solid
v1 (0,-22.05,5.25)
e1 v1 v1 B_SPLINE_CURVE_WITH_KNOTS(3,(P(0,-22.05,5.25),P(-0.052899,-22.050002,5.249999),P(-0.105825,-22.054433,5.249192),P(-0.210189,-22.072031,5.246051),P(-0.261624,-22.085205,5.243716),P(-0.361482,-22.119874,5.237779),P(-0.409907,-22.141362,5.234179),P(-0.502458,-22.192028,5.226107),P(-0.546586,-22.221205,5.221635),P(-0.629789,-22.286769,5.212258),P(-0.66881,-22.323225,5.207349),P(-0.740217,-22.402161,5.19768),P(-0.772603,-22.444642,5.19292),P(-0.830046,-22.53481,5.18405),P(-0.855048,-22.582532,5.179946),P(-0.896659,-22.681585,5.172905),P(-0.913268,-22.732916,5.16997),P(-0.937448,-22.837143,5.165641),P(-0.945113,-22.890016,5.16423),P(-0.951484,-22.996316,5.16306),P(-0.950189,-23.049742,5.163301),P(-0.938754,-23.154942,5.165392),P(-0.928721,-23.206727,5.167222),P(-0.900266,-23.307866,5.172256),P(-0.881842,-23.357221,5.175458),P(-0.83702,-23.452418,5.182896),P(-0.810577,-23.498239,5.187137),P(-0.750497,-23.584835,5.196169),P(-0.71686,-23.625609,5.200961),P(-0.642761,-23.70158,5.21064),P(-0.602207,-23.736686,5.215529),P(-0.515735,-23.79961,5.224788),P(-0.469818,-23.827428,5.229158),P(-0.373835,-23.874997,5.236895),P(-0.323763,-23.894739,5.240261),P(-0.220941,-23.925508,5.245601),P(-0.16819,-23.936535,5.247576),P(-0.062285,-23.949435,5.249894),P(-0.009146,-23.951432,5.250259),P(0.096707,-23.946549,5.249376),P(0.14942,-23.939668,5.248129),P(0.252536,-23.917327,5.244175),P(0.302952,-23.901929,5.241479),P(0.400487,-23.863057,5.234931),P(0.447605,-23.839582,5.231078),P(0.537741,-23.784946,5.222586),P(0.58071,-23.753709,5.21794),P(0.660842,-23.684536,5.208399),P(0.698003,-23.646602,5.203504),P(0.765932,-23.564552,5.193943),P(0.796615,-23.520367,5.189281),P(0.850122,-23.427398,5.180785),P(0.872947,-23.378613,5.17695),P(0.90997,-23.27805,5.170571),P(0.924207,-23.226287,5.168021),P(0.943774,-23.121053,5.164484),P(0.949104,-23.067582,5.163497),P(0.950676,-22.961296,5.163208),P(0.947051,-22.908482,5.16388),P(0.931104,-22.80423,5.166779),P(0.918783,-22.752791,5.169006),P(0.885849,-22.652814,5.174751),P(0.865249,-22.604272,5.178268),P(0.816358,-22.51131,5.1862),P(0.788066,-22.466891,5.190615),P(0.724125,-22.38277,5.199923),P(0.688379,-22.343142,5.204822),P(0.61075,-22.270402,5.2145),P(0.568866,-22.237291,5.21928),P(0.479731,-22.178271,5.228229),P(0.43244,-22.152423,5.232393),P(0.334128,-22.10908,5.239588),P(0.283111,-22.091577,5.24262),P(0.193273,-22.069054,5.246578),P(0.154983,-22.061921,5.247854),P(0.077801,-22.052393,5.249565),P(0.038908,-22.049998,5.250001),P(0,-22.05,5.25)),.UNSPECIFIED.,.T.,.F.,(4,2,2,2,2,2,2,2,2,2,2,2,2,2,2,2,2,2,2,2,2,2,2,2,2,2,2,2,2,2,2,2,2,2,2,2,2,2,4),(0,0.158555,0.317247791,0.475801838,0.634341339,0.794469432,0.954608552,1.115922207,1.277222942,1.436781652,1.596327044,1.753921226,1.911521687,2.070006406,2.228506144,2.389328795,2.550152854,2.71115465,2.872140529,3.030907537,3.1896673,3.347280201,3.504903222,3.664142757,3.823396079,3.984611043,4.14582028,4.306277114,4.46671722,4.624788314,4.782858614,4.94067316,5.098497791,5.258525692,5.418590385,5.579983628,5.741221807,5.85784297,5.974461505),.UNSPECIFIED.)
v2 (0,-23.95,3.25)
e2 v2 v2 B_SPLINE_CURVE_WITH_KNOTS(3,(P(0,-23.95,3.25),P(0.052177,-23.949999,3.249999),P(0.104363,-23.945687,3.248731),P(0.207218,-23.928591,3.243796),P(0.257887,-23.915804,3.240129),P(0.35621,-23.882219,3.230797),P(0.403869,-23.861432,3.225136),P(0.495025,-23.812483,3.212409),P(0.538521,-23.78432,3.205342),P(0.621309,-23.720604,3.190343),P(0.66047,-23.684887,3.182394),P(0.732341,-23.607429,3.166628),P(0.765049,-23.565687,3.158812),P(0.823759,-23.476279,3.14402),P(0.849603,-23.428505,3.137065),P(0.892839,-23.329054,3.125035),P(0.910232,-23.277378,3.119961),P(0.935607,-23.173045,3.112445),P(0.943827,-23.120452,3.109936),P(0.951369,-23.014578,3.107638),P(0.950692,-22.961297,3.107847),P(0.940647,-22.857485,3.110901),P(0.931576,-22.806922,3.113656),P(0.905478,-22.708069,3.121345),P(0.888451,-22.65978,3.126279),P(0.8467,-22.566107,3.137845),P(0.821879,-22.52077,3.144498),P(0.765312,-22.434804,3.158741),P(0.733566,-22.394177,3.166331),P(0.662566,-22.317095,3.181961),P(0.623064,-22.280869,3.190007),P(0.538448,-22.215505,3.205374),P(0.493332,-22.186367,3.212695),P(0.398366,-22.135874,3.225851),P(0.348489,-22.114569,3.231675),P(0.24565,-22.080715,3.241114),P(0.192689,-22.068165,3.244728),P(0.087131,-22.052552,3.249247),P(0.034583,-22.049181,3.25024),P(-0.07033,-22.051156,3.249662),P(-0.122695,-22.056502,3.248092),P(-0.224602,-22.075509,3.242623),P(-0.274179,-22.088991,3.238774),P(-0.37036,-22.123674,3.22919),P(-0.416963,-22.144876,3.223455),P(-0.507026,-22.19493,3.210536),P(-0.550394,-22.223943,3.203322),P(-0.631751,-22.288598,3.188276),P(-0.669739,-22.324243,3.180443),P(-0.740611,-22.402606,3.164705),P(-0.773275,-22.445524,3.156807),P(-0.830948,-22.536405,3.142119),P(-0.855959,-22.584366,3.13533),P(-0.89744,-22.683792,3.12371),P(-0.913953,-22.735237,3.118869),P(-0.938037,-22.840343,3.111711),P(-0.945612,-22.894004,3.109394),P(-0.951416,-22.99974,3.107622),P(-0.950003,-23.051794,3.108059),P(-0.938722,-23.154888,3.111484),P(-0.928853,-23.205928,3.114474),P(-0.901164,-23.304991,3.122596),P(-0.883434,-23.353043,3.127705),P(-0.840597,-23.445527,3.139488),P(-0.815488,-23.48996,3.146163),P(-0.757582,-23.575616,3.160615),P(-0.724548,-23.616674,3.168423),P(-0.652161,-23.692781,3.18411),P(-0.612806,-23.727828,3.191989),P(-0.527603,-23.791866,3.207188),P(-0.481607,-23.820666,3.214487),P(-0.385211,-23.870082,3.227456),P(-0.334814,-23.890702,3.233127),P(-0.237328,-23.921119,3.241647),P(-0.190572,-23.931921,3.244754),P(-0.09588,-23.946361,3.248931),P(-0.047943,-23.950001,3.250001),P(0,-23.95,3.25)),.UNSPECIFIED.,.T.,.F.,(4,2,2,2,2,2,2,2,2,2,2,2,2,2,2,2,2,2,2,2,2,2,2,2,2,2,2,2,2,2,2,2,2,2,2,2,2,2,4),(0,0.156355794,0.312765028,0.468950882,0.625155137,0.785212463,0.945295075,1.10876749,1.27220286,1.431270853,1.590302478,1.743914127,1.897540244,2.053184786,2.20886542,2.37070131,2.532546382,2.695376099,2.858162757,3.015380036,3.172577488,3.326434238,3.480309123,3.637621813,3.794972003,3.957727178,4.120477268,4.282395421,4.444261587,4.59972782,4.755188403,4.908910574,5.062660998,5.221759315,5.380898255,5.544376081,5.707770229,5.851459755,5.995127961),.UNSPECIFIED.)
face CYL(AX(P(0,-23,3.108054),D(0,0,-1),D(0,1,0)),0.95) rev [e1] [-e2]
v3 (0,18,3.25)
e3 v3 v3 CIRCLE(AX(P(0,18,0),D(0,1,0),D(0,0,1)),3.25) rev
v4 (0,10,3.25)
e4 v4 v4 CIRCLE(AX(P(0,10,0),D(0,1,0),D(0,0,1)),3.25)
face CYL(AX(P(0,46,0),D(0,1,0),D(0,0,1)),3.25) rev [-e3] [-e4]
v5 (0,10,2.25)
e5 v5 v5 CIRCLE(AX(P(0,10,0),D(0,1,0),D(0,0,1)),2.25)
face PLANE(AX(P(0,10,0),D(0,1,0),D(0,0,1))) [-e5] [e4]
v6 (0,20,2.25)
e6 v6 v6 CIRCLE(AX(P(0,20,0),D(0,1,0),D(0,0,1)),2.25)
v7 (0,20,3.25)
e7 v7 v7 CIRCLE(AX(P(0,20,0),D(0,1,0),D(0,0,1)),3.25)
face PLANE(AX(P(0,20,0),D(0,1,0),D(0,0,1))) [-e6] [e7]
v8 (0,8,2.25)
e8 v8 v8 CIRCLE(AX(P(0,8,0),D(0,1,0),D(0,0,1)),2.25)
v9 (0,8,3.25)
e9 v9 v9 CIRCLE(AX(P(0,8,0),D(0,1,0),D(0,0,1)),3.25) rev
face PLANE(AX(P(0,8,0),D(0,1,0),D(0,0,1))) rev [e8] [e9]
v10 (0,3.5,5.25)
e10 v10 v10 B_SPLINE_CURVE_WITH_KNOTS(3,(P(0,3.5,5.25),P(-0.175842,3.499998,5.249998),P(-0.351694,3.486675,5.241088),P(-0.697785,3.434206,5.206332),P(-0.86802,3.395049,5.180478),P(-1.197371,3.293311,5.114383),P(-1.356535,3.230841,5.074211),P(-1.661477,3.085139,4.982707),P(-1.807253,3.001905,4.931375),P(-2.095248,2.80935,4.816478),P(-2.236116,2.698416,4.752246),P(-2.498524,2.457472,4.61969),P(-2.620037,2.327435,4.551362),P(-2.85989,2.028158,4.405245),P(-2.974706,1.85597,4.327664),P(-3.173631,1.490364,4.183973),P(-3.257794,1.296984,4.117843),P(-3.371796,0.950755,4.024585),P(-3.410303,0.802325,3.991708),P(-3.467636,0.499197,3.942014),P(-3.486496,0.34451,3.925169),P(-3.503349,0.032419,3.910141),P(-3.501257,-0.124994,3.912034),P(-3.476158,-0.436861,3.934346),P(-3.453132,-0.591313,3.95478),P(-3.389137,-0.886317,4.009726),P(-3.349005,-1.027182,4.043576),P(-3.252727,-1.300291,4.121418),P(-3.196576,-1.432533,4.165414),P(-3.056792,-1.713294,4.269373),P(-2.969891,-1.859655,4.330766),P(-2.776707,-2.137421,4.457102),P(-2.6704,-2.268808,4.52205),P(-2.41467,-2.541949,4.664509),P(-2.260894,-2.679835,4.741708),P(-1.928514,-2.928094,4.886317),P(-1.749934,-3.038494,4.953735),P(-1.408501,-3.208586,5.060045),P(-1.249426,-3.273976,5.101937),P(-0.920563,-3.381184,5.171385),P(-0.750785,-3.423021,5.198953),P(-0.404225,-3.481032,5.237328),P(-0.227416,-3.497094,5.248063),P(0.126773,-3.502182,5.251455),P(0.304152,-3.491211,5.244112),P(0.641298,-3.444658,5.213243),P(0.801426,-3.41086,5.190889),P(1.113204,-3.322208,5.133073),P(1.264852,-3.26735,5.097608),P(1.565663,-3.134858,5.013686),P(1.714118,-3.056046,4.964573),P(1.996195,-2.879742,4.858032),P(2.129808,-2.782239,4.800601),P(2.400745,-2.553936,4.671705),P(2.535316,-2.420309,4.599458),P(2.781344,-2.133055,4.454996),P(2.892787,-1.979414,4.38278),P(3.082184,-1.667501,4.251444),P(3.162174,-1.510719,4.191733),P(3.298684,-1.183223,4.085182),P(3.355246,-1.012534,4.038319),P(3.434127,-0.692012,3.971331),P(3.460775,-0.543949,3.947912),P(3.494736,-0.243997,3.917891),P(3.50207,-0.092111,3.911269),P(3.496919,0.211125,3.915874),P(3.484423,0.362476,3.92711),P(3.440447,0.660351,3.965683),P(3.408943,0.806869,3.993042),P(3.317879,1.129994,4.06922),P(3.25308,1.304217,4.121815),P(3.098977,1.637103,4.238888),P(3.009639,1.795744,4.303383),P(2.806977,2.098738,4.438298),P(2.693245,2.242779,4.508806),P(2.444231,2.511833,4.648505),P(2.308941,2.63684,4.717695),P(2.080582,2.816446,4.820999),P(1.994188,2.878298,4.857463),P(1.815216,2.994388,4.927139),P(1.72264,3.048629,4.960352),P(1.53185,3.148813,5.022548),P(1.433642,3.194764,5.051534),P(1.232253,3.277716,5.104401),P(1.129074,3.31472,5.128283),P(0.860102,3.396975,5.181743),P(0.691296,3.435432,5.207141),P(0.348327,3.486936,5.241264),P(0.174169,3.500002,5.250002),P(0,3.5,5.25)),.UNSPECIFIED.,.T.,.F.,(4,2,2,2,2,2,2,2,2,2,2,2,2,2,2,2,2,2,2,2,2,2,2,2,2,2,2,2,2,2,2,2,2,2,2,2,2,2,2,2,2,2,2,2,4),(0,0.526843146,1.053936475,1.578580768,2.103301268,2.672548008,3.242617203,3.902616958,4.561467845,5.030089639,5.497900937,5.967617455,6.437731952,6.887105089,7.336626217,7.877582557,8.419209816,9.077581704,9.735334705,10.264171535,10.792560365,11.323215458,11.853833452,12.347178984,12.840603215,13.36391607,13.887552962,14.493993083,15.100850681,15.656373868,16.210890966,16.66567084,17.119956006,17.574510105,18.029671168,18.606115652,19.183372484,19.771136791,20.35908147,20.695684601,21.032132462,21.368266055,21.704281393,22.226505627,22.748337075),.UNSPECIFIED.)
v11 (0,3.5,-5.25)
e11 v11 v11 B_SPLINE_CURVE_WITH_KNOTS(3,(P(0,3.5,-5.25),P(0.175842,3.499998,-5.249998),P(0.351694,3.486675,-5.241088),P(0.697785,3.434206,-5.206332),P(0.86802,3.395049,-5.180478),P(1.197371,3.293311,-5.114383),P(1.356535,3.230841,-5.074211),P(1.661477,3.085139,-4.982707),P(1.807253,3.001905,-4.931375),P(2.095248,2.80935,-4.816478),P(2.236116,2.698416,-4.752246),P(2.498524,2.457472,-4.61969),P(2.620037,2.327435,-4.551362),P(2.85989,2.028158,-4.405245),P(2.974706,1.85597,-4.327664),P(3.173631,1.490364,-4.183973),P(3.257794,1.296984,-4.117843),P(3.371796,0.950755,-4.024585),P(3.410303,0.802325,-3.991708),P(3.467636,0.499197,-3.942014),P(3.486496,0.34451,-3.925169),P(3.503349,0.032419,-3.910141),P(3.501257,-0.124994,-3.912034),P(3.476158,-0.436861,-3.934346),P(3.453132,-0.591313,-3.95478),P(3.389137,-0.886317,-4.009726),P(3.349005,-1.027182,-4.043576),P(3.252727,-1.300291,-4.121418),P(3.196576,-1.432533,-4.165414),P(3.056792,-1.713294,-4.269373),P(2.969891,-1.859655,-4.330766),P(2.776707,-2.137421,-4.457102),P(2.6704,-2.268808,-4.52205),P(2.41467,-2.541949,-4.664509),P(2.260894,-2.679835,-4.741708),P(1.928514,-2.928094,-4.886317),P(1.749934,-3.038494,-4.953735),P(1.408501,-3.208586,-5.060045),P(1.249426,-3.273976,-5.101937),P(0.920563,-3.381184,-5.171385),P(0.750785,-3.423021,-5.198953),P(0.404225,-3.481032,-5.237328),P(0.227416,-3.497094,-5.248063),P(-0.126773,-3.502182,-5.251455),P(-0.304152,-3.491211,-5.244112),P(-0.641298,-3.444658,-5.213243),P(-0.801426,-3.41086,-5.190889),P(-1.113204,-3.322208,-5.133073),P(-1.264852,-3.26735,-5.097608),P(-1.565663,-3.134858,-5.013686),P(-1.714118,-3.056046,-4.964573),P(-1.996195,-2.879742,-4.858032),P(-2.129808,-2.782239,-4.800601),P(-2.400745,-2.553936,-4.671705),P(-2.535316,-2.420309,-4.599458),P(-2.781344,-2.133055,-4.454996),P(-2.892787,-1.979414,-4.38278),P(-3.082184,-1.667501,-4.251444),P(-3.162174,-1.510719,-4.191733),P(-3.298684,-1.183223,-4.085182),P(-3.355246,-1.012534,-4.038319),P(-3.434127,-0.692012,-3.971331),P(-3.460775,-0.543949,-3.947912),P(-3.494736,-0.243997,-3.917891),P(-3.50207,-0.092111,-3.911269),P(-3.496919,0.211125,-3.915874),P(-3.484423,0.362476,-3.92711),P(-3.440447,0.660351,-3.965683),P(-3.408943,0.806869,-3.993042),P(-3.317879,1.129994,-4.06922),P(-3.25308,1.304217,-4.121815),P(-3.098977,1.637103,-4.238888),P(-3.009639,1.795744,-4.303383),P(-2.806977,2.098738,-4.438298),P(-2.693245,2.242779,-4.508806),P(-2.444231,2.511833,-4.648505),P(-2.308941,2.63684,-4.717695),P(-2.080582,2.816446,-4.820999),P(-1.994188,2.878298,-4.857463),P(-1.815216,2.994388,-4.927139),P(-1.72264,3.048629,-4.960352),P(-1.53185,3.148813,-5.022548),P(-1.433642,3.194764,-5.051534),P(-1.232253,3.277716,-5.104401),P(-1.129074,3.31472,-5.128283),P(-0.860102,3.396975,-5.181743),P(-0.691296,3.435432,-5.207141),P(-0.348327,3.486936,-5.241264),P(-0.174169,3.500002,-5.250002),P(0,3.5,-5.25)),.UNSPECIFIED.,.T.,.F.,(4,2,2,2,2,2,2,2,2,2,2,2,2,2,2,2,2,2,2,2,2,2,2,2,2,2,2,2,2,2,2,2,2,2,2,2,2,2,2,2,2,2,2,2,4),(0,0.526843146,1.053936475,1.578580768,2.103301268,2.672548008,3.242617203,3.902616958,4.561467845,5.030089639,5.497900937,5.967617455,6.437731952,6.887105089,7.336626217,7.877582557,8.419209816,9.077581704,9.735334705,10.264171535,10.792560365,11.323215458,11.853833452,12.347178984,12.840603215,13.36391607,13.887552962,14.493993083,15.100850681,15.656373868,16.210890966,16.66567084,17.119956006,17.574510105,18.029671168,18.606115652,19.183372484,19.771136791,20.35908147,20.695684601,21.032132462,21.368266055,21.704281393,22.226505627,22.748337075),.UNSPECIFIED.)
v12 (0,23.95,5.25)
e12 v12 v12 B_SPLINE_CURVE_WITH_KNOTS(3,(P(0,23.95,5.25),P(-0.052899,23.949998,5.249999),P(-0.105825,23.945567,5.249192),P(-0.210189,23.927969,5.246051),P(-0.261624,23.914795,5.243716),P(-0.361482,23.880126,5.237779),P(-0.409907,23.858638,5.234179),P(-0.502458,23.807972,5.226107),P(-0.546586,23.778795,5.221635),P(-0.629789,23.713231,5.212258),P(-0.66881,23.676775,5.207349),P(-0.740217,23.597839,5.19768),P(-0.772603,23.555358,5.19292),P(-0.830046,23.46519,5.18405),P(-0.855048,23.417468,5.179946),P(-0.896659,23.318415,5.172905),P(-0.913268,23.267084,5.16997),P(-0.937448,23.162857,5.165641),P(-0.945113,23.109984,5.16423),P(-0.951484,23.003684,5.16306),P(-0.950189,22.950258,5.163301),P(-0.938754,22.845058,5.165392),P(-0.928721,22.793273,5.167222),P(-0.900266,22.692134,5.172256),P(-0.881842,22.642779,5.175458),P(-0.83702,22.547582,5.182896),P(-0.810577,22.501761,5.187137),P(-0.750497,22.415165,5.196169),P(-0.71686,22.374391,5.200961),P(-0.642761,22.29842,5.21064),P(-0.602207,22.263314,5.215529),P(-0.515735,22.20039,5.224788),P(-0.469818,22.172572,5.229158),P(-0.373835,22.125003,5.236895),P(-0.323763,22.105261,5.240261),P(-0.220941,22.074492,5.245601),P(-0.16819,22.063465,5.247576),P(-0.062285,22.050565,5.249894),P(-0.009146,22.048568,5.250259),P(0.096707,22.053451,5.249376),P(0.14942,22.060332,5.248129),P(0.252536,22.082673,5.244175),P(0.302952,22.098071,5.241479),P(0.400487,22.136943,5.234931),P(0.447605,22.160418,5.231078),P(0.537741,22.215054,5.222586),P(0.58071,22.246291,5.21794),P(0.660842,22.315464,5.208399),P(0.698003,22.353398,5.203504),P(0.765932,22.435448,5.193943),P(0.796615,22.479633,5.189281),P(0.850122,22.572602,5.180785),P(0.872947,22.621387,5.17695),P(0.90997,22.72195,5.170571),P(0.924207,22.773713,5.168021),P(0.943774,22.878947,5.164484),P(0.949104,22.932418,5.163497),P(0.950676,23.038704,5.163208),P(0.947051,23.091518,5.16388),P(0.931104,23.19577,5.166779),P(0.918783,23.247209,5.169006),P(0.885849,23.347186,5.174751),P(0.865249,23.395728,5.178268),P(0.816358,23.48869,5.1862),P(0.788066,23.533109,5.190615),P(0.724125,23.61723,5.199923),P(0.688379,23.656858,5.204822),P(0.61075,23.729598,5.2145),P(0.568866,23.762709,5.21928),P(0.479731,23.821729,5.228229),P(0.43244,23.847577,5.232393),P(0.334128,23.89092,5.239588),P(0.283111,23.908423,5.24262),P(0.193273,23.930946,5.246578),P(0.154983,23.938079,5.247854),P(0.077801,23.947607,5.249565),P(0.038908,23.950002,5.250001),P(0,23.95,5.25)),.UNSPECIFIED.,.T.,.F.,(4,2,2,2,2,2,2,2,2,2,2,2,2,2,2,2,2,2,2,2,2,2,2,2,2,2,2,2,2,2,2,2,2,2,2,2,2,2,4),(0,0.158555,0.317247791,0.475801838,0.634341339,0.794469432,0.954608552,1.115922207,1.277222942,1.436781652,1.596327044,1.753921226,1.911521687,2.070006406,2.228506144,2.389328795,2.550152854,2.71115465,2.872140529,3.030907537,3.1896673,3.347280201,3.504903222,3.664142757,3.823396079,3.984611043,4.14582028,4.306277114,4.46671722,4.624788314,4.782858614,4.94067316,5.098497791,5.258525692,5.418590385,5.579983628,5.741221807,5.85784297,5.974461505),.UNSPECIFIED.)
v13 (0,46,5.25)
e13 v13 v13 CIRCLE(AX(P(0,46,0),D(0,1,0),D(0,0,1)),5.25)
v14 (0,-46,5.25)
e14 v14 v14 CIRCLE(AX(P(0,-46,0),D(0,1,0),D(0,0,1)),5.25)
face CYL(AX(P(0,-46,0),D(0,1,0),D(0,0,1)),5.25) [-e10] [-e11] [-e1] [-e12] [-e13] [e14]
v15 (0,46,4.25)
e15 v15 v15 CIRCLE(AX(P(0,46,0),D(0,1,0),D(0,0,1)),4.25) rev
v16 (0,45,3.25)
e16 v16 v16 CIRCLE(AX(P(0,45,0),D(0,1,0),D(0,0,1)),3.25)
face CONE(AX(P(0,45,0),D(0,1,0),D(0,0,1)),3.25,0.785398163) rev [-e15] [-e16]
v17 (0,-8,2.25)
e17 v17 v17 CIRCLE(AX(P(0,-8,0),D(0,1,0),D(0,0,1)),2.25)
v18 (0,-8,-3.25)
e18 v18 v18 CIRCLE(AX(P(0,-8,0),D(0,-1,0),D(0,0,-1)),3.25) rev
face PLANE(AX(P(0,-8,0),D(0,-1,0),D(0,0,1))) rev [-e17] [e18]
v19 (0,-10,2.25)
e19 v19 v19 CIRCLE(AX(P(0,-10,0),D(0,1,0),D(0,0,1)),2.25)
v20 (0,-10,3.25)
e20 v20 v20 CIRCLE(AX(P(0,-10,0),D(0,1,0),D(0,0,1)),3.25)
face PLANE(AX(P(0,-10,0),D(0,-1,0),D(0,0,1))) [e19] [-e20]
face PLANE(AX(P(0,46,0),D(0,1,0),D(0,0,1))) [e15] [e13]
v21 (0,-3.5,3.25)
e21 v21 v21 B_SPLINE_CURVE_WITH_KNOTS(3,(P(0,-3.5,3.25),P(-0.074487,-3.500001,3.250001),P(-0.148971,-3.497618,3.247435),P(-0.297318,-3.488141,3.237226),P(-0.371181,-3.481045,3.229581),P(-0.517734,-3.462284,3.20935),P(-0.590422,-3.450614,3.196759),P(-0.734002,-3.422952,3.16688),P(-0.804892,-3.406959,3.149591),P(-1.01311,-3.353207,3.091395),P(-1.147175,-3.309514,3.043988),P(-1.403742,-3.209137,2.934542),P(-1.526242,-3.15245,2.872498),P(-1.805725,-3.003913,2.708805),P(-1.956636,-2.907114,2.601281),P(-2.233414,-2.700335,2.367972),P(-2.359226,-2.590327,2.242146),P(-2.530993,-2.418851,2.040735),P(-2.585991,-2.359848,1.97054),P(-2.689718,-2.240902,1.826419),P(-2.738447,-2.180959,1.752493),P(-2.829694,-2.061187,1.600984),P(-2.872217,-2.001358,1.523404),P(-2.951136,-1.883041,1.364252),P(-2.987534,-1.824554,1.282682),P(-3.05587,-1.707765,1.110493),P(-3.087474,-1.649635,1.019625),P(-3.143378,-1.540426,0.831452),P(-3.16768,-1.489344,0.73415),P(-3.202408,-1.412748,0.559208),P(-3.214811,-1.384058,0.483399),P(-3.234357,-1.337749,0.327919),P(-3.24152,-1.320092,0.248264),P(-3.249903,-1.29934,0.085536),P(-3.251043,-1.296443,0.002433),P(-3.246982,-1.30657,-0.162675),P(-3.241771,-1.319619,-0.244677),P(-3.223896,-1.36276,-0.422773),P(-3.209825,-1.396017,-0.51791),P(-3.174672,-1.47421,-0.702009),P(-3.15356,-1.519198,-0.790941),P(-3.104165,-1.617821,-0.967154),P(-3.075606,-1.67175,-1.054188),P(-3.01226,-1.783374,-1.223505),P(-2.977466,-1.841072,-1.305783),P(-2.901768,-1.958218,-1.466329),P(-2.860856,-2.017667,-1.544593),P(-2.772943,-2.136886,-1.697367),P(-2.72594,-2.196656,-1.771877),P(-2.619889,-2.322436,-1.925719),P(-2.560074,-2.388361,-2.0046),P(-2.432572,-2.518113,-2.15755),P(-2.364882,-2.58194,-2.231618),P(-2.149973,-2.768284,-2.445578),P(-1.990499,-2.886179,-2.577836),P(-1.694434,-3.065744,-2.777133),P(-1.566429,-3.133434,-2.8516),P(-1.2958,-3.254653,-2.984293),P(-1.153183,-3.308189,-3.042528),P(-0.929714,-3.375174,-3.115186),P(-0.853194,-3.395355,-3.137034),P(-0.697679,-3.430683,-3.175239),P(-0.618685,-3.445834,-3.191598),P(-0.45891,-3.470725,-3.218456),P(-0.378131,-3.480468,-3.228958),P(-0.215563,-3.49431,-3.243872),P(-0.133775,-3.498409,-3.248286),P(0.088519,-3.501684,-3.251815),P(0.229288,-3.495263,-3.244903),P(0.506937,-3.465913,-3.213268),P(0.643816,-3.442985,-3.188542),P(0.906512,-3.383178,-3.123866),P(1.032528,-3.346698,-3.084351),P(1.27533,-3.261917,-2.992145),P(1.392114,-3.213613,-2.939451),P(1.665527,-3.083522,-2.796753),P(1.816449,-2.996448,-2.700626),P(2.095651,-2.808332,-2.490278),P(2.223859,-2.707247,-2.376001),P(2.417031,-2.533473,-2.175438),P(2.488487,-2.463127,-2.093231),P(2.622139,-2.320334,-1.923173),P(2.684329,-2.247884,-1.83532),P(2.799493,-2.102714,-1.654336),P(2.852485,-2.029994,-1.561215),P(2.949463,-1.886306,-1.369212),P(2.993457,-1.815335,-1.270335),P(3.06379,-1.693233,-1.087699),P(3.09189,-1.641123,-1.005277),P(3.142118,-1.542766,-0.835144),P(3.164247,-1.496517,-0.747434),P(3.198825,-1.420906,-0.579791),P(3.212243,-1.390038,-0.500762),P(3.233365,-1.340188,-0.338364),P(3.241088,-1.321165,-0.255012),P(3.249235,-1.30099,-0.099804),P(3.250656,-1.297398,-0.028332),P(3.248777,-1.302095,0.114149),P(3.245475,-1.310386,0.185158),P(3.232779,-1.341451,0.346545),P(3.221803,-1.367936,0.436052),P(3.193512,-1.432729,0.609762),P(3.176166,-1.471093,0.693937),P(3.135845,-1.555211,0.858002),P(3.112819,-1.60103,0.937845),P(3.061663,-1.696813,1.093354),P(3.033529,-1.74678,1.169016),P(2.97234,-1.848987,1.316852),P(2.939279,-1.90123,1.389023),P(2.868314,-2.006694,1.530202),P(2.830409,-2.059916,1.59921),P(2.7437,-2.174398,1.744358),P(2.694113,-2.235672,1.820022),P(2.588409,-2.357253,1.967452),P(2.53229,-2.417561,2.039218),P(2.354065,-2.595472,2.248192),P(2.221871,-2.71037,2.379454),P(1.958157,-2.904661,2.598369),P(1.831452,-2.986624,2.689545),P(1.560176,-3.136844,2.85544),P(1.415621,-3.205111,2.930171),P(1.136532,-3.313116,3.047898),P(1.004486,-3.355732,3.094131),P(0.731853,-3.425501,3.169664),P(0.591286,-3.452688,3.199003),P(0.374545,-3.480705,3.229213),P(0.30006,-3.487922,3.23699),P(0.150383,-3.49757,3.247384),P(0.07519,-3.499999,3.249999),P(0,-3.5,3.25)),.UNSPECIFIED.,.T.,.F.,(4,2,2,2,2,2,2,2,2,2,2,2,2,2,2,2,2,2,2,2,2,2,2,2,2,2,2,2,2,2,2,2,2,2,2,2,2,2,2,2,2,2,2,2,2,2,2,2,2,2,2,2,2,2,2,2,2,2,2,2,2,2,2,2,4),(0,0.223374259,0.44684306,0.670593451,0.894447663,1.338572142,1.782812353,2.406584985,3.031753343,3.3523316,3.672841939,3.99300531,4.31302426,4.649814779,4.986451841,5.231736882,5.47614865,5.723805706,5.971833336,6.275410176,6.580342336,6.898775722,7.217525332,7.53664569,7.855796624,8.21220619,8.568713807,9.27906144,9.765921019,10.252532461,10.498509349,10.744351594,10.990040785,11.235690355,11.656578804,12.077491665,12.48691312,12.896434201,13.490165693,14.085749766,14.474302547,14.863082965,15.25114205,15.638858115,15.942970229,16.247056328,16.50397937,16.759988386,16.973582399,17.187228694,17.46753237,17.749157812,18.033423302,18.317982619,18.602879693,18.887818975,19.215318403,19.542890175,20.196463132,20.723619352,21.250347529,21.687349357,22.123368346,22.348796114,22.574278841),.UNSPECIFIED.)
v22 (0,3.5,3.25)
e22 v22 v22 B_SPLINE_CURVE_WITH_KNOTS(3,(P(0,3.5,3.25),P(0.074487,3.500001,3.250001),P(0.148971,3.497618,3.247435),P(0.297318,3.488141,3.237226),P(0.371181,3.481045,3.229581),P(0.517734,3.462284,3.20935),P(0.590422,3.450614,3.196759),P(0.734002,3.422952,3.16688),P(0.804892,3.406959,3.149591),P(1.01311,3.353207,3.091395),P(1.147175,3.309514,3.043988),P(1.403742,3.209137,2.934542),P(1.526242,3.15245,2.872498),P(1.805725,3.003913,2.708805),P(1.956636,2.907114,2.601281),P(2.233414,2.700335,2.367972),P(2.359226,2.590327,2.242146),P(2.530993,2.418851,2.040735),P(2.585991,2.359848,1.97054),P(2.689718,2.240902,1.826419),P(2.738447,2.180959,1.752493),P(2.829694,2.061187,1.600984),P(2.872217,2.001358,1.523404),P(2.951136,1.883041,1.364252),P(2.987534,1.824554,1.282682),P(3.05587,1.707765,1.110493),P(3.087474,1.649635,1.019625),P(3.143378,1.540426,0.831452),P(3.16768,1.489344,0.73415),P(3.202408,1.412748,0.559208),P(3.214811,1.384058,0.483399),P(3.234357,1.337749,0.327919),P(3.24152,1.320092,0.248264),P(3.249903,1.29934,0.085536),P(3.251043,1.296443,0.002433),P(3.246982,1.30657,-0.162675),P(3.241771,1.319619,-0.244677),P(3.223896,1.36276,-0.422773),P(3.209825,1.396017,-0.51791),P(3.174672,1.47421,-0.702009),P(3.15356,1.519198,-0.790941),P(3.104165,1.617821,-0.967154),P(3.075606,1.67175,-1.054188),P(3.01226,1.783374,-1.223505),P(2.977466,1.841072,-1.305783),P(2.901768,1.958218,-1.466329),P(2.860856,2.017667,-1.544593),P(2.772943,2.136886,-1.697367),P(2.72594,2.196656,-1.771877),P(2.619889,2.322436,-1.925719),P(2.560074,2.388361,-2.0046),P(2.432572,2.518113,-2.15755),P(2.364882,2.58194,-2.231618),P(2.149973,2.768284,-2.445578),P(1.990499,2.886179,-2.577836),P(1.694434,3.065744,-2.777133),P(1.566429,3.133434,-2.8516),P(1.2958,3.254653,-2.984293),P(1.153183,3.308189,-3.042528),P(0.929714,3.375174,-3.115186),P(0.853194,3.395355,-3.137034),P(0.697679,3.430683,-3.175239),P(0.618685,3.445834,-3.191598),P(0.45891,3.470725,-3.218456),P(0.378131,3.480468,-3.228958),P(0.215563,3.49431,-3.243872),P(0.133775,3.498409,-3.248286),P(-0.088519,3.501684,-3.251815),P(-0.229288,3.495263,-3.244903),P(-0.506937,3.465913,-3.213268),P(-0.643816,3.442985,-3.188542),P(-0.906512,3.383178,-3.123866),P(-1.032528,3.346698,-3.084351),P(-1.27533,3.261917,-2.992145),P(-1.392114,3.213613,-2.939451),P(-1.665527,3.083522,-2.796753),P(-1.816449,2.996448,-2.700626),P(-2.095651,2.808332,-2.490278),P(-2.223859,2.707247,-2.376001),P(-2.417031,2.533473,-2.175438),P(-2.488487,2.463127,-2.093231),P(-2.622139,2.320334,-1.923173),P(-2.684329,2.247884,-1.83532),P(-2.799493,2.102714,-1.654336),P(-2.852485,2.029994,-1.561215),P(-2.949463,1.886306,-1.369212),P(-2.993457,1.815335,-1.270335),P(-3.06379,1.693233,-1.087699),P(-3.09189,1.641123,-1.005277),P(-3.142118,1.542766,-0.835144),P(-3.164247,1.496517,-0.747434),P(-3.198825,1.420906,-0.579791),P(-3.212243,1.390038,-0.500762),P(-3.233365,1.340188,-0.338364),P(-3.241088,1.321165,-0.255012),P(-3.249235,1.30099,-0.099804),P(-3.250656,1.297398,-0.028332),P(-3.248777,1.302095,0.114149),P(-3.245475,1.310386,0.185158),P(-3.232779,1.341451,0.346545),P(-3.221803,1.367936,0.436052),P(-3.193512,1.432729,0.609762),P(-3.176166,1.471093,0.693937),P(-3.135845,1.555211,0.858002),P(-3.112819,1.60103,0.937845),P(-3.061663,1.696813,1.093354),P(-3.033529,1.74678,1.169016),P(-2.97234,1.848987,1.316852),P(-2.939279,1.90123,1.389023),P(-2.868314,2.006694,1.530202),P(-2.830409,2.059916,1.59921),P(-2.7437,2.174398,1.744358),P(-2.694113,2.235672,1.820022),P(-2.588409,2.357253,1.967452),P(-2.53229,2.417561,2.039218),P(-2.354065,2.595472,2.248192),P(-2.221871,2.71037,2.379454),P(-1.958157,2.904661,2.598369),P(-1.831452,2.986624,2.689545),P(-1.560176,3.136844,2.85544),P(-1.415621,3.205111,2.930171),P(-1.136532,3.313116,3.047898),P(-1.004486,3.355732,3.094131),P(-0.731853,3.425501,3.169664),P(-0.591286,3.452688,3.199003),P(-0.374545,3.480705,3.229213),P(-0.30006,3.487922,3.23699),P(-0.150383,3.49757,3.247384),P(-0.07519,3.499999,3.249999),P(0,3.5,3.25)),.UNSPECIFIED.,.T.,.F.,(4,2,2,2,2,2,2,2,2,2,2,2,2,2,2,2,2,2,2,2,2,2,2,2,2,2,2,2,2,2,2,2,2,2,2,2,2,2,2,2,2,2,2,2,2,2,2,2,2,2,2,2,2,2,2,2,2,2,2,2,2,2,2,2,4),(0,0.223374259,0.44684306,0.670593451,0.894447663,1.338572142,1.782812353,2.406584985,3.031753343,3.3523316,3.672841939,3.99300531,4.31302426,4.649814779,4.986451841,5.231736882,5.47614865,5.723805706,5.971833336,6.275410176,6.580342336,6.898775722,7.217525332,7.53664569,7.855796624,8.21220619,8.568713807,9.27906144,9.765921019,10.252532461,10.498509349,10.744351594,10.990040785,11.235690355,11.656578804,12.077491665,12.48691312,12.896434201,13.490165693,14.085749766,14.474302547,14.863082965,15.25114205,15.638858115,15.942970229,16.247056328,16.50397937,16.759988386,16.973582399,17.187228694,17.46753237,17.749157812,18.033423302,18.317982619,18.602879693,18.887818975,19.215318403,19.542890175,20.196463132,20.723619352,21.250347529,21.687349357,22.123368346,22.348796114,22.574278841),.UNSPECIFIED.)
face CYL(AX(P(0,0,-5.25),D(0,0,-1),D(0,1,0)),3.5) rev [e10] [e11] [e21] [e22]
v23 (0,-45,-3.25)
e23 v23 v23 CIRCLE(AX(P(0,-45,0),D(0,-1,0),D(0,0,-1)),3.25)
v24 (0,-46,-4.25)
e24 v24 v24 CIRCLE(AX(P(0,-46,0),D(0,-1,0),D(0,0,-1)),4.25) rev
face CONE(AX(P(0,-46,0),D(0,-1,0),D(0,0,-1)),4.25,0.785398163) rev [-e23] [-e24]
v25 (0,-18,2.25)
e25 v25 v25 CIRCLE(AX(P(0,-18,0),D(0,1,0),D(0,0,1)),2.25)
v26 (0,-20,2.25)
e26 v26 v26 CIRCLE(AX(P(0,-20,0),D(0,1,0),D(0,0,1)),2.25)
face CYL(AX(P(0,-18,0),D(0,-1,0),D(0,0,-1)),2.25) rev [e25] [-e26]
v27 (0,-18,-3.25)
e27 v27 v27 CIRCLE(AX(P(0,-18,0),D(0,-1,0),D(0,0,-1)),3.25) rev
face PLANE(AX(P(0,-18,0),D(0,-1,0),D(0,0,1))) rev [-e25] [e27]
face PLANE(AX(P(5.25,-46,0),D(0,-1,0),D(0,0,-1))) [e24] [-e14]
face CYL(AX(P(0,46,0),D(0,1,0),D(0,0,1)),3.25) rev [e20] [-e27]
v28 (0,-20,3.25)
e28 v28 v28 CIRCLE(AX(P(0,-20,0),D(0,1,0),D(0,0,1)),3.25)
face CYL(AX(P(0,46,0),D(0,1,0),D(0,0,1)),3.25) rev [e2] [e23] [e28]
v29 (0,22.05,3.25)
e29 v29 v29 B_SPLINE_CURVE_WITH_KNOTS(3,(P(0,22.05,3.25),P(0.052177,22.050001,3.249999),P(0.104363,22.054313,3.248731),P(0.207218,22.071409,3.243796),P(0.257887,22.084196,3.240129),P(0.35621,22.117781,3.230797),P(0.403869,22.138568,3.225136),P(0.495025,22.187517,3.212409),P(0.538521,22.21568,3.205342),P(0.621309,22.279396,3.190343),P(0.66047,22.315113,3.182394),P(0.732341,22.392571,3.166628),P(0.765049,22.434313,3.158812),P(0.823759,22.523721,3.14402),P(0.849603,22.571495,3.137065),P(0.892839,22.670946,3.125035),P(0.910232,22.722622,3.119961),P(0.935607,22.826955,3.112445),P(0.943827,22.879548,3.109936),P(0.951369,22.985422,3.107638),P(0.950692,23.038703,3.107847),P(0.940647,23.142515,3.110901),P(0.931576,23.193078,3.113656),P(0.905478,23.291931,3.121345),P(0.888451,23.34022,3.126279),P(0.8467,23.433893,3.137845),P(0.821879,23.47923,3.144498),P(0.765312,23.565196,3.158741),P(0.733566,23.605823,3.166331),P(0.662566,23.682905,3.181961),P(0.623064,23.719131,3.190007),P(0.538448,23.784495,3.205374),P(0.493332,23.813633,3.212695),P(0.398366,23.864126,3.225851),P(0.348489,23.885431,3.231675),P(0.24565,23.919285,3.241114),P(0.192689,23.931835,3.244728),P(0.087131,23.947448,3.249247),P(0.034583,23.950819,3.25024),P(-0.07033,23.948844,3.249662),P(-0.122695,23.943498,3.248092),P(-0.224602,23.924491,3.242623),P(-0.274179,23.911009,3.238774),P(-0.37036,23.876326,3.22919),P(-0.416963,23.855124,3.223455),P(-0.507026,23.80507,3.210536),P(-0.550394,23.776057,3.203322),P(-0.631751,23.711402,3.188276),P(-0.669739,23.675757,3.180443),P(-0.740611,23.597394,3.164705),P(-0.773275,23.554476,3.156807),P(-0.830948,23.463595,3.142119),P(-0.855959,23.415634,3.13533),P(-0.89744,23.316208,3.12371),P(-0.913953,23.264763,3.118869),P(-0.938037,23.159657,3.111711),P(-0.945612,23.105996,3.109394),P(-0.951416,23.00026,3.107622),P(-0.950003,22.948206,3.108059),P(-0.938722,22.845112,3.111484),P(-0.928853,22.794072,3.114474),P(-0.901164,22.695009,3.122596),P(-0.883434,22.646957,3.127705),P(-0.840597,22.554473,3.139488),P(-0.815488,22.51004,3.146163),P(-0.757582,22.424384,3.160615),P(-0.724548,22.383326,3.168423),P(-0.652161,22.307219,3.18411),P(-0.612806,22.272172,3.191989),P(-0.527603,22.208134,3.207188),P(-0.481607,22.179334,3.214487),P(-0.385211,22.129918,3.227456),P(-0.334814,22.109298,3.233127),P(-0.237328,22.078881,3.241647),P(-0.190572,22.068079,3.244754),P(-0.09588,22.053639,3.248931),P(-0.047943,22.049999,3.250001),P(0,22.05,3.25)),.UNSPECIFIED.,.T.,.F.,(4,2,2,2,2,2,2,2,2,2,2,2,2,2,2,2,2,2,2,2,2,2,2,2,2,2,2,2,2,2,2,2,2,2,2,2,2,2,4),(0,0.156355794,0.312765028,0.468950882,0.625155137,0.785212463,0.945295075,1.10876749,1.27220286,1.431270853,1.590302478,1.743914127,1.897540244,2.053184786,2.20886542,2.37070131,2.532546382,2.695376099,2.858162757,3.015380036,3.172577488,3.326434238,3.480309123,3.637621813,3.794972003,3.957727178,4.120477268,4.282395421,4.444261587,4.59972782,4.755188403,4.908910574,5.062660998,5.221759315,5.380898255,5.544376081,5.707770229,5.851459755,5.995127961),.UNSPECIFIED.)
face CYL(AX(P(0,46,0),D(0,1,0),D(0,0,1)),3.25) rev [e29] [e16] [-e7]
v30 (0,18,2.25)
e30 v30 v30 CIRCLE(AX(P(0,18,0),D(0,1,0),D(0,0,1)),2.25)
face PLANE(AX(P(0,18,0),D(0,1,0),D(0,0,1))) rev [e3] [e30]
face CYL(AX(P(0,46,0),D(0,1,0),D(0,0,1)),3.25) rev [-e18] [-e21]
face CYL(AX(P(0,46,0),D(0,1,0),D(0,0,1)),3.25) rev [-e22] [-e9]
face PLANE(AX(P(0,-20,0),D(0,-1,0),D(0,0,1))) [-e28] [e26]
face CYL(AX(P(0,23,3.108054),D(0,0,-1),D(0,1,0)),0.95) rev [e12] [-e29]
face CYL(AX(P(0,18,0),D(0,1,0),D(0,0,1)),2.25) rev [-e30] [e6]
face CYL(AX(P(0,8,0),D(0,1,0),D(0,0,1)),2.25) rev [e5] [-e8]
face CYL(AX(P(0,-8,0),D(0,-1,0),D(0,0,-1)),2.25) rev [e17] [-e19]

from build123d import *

# Parameters (mm, degrees)
SKETCH1_W                  = 5.25
SKETCH1_H                  = 92
HOLEWZD1_D                 = 7
F_6_5_6_5_DIAMETER_HOLE0_D = 6.5
HOLEWZD3_D                 = 1.9
HOLEWZD3_DEPTH             = 2.141945946
BOSS_EXTRUDE1_START        = -2
SKETCH7_R                  = 3.25
SKETCH7_R_2                = 2.25
BOSS_EXTRUDE1_DEPTH        = 2
BOSS_EXTRUDE2_START        = -2
SKETCH8_R                  = 3.25
SKETCH8_R_2                = 2.25
BOSS_EXTRUDE2_DEPTH        = 2
CHAMFER2_SIZE              = 1


with BuildPart() as part:
    # Sketch1 → Revolve1 (revolve)
    with BuildSketch(Plane(origin=(0, 0, 1.653301878), x_dir=(-1, 0, 0), z_dir=(0, 0, -1)), mode=Mode.PRIVATE) as revolve1_sk:
        with Locations((-2.625, 15.152992085)):
            Rectangle(SKETCH1_W, SKETCH1_H)
    revolve(revolve1_sk.sketch.rotate(Axis((0, -30.847007915, 1.653301878), (0, 1, 0)), 270), axis=Axis((0, -30.847007915, 1.653301878), (0, 1, 0)))

    # HoleWzd1 (through all)
    with Locations(Plane(origin=(0, 15.152992085, -3.596698122), x_dir=(-1, 0, 0), z_dir=(0, 0, -1))):
        with Locations((0, 0)):
            Hole(HOLEWZD1_D / 2)

    # Ø6.5 (6.5) Diameter Hole0 (through all)
    with Locations(Plane(origin=(0, 61.152992085, 0), x_dir=(1, 0, 0), z_dir=(0, 1, 0))):
        with Locations((0, -1.653301878)):
            Hole(F_6_5_6_5_DIAMETER_HOLE0_D / 2)

    # HoleWzd3
    with Locations(Plane(origin=(0, 0, 4.761355931), x_dir=(-1, 0, 0), z_dir=(0, 0, -1))):
        with Locations((0, 38.152992085), (0, -7.847007915)):
            Hole(HOLEWZD3_D / 2, depth=HOLEWZD3_DEPTH)

    # Sketch7 → Boss-Extrude1 (add)
    with BuildSketch(Plane(origin=(0, 35.152992085, 0), x_dir=(1, 0, 0), z_dir=(0, 1, 0)).offset(BOSS_EXTRUDE1_START)):
        with Locations(Location((0, -1.653301878, 0), (0, 0, 270))):
            Circle(SKETCH7_R)
        with Locations(Location((0, -1.653301878, 0), (0, 0, 270))):
            Circle(SKETCH7_R_2, mode=Mode.SUBTRACT)
    boss_extrude1 = extrude(amount=BOSS_EXTRUDE1_DEPTH)

    # Sketch8 → Boss-Extrude2 (add)
    with BuildSketch(Plane(origin=(0, 25.152992085, 0), x_dir=(1, 0, 0), z_dir=(0, 1, 0)).offset(BOSS_EXTRUDE2_START)):
        with Locations(Location((0, -1.653301878, 0), (0, 0, 270))):
            Circle(SKETCH8_R)
        with Locations(Location((0, -1.653301878, 0), (0, 0, 270))):
            Circle(SKETCH8_R_2, mode=Mode.SUBTRACT)
    boss_extrude2 = extrude(amount=BOSS_EXTRUDE2_DEPTH)

    # Chamfer2
    chamfer2_edges = [part.edges().sort_by_distance(p)[0] for p in [
        (3.25, -30.847007915, 1.653301878),
        (3.25, 61.152992085, 1.653301878),
    ]]
    chamfer(chamfer2_edges, length=CHAMFER2_SIZE)

    # Mirror1: Boss-Extrude1, Boss-Extrude2 across plane
    add(boss_extrude1.mirror(Plane.ZX.offset(15.152992085)))
    add(boss_extrude2.mirror(Plane.ZX.offset(15.152992085)))


with BuildPart() as part_1:
    # Move Body 1: read off the stored shape, not the designer's step
    # Move Body 1: moved
    add(part.part.moved(Location((0, -15.1529921, -1.6533019))))


solid = part_1.part
